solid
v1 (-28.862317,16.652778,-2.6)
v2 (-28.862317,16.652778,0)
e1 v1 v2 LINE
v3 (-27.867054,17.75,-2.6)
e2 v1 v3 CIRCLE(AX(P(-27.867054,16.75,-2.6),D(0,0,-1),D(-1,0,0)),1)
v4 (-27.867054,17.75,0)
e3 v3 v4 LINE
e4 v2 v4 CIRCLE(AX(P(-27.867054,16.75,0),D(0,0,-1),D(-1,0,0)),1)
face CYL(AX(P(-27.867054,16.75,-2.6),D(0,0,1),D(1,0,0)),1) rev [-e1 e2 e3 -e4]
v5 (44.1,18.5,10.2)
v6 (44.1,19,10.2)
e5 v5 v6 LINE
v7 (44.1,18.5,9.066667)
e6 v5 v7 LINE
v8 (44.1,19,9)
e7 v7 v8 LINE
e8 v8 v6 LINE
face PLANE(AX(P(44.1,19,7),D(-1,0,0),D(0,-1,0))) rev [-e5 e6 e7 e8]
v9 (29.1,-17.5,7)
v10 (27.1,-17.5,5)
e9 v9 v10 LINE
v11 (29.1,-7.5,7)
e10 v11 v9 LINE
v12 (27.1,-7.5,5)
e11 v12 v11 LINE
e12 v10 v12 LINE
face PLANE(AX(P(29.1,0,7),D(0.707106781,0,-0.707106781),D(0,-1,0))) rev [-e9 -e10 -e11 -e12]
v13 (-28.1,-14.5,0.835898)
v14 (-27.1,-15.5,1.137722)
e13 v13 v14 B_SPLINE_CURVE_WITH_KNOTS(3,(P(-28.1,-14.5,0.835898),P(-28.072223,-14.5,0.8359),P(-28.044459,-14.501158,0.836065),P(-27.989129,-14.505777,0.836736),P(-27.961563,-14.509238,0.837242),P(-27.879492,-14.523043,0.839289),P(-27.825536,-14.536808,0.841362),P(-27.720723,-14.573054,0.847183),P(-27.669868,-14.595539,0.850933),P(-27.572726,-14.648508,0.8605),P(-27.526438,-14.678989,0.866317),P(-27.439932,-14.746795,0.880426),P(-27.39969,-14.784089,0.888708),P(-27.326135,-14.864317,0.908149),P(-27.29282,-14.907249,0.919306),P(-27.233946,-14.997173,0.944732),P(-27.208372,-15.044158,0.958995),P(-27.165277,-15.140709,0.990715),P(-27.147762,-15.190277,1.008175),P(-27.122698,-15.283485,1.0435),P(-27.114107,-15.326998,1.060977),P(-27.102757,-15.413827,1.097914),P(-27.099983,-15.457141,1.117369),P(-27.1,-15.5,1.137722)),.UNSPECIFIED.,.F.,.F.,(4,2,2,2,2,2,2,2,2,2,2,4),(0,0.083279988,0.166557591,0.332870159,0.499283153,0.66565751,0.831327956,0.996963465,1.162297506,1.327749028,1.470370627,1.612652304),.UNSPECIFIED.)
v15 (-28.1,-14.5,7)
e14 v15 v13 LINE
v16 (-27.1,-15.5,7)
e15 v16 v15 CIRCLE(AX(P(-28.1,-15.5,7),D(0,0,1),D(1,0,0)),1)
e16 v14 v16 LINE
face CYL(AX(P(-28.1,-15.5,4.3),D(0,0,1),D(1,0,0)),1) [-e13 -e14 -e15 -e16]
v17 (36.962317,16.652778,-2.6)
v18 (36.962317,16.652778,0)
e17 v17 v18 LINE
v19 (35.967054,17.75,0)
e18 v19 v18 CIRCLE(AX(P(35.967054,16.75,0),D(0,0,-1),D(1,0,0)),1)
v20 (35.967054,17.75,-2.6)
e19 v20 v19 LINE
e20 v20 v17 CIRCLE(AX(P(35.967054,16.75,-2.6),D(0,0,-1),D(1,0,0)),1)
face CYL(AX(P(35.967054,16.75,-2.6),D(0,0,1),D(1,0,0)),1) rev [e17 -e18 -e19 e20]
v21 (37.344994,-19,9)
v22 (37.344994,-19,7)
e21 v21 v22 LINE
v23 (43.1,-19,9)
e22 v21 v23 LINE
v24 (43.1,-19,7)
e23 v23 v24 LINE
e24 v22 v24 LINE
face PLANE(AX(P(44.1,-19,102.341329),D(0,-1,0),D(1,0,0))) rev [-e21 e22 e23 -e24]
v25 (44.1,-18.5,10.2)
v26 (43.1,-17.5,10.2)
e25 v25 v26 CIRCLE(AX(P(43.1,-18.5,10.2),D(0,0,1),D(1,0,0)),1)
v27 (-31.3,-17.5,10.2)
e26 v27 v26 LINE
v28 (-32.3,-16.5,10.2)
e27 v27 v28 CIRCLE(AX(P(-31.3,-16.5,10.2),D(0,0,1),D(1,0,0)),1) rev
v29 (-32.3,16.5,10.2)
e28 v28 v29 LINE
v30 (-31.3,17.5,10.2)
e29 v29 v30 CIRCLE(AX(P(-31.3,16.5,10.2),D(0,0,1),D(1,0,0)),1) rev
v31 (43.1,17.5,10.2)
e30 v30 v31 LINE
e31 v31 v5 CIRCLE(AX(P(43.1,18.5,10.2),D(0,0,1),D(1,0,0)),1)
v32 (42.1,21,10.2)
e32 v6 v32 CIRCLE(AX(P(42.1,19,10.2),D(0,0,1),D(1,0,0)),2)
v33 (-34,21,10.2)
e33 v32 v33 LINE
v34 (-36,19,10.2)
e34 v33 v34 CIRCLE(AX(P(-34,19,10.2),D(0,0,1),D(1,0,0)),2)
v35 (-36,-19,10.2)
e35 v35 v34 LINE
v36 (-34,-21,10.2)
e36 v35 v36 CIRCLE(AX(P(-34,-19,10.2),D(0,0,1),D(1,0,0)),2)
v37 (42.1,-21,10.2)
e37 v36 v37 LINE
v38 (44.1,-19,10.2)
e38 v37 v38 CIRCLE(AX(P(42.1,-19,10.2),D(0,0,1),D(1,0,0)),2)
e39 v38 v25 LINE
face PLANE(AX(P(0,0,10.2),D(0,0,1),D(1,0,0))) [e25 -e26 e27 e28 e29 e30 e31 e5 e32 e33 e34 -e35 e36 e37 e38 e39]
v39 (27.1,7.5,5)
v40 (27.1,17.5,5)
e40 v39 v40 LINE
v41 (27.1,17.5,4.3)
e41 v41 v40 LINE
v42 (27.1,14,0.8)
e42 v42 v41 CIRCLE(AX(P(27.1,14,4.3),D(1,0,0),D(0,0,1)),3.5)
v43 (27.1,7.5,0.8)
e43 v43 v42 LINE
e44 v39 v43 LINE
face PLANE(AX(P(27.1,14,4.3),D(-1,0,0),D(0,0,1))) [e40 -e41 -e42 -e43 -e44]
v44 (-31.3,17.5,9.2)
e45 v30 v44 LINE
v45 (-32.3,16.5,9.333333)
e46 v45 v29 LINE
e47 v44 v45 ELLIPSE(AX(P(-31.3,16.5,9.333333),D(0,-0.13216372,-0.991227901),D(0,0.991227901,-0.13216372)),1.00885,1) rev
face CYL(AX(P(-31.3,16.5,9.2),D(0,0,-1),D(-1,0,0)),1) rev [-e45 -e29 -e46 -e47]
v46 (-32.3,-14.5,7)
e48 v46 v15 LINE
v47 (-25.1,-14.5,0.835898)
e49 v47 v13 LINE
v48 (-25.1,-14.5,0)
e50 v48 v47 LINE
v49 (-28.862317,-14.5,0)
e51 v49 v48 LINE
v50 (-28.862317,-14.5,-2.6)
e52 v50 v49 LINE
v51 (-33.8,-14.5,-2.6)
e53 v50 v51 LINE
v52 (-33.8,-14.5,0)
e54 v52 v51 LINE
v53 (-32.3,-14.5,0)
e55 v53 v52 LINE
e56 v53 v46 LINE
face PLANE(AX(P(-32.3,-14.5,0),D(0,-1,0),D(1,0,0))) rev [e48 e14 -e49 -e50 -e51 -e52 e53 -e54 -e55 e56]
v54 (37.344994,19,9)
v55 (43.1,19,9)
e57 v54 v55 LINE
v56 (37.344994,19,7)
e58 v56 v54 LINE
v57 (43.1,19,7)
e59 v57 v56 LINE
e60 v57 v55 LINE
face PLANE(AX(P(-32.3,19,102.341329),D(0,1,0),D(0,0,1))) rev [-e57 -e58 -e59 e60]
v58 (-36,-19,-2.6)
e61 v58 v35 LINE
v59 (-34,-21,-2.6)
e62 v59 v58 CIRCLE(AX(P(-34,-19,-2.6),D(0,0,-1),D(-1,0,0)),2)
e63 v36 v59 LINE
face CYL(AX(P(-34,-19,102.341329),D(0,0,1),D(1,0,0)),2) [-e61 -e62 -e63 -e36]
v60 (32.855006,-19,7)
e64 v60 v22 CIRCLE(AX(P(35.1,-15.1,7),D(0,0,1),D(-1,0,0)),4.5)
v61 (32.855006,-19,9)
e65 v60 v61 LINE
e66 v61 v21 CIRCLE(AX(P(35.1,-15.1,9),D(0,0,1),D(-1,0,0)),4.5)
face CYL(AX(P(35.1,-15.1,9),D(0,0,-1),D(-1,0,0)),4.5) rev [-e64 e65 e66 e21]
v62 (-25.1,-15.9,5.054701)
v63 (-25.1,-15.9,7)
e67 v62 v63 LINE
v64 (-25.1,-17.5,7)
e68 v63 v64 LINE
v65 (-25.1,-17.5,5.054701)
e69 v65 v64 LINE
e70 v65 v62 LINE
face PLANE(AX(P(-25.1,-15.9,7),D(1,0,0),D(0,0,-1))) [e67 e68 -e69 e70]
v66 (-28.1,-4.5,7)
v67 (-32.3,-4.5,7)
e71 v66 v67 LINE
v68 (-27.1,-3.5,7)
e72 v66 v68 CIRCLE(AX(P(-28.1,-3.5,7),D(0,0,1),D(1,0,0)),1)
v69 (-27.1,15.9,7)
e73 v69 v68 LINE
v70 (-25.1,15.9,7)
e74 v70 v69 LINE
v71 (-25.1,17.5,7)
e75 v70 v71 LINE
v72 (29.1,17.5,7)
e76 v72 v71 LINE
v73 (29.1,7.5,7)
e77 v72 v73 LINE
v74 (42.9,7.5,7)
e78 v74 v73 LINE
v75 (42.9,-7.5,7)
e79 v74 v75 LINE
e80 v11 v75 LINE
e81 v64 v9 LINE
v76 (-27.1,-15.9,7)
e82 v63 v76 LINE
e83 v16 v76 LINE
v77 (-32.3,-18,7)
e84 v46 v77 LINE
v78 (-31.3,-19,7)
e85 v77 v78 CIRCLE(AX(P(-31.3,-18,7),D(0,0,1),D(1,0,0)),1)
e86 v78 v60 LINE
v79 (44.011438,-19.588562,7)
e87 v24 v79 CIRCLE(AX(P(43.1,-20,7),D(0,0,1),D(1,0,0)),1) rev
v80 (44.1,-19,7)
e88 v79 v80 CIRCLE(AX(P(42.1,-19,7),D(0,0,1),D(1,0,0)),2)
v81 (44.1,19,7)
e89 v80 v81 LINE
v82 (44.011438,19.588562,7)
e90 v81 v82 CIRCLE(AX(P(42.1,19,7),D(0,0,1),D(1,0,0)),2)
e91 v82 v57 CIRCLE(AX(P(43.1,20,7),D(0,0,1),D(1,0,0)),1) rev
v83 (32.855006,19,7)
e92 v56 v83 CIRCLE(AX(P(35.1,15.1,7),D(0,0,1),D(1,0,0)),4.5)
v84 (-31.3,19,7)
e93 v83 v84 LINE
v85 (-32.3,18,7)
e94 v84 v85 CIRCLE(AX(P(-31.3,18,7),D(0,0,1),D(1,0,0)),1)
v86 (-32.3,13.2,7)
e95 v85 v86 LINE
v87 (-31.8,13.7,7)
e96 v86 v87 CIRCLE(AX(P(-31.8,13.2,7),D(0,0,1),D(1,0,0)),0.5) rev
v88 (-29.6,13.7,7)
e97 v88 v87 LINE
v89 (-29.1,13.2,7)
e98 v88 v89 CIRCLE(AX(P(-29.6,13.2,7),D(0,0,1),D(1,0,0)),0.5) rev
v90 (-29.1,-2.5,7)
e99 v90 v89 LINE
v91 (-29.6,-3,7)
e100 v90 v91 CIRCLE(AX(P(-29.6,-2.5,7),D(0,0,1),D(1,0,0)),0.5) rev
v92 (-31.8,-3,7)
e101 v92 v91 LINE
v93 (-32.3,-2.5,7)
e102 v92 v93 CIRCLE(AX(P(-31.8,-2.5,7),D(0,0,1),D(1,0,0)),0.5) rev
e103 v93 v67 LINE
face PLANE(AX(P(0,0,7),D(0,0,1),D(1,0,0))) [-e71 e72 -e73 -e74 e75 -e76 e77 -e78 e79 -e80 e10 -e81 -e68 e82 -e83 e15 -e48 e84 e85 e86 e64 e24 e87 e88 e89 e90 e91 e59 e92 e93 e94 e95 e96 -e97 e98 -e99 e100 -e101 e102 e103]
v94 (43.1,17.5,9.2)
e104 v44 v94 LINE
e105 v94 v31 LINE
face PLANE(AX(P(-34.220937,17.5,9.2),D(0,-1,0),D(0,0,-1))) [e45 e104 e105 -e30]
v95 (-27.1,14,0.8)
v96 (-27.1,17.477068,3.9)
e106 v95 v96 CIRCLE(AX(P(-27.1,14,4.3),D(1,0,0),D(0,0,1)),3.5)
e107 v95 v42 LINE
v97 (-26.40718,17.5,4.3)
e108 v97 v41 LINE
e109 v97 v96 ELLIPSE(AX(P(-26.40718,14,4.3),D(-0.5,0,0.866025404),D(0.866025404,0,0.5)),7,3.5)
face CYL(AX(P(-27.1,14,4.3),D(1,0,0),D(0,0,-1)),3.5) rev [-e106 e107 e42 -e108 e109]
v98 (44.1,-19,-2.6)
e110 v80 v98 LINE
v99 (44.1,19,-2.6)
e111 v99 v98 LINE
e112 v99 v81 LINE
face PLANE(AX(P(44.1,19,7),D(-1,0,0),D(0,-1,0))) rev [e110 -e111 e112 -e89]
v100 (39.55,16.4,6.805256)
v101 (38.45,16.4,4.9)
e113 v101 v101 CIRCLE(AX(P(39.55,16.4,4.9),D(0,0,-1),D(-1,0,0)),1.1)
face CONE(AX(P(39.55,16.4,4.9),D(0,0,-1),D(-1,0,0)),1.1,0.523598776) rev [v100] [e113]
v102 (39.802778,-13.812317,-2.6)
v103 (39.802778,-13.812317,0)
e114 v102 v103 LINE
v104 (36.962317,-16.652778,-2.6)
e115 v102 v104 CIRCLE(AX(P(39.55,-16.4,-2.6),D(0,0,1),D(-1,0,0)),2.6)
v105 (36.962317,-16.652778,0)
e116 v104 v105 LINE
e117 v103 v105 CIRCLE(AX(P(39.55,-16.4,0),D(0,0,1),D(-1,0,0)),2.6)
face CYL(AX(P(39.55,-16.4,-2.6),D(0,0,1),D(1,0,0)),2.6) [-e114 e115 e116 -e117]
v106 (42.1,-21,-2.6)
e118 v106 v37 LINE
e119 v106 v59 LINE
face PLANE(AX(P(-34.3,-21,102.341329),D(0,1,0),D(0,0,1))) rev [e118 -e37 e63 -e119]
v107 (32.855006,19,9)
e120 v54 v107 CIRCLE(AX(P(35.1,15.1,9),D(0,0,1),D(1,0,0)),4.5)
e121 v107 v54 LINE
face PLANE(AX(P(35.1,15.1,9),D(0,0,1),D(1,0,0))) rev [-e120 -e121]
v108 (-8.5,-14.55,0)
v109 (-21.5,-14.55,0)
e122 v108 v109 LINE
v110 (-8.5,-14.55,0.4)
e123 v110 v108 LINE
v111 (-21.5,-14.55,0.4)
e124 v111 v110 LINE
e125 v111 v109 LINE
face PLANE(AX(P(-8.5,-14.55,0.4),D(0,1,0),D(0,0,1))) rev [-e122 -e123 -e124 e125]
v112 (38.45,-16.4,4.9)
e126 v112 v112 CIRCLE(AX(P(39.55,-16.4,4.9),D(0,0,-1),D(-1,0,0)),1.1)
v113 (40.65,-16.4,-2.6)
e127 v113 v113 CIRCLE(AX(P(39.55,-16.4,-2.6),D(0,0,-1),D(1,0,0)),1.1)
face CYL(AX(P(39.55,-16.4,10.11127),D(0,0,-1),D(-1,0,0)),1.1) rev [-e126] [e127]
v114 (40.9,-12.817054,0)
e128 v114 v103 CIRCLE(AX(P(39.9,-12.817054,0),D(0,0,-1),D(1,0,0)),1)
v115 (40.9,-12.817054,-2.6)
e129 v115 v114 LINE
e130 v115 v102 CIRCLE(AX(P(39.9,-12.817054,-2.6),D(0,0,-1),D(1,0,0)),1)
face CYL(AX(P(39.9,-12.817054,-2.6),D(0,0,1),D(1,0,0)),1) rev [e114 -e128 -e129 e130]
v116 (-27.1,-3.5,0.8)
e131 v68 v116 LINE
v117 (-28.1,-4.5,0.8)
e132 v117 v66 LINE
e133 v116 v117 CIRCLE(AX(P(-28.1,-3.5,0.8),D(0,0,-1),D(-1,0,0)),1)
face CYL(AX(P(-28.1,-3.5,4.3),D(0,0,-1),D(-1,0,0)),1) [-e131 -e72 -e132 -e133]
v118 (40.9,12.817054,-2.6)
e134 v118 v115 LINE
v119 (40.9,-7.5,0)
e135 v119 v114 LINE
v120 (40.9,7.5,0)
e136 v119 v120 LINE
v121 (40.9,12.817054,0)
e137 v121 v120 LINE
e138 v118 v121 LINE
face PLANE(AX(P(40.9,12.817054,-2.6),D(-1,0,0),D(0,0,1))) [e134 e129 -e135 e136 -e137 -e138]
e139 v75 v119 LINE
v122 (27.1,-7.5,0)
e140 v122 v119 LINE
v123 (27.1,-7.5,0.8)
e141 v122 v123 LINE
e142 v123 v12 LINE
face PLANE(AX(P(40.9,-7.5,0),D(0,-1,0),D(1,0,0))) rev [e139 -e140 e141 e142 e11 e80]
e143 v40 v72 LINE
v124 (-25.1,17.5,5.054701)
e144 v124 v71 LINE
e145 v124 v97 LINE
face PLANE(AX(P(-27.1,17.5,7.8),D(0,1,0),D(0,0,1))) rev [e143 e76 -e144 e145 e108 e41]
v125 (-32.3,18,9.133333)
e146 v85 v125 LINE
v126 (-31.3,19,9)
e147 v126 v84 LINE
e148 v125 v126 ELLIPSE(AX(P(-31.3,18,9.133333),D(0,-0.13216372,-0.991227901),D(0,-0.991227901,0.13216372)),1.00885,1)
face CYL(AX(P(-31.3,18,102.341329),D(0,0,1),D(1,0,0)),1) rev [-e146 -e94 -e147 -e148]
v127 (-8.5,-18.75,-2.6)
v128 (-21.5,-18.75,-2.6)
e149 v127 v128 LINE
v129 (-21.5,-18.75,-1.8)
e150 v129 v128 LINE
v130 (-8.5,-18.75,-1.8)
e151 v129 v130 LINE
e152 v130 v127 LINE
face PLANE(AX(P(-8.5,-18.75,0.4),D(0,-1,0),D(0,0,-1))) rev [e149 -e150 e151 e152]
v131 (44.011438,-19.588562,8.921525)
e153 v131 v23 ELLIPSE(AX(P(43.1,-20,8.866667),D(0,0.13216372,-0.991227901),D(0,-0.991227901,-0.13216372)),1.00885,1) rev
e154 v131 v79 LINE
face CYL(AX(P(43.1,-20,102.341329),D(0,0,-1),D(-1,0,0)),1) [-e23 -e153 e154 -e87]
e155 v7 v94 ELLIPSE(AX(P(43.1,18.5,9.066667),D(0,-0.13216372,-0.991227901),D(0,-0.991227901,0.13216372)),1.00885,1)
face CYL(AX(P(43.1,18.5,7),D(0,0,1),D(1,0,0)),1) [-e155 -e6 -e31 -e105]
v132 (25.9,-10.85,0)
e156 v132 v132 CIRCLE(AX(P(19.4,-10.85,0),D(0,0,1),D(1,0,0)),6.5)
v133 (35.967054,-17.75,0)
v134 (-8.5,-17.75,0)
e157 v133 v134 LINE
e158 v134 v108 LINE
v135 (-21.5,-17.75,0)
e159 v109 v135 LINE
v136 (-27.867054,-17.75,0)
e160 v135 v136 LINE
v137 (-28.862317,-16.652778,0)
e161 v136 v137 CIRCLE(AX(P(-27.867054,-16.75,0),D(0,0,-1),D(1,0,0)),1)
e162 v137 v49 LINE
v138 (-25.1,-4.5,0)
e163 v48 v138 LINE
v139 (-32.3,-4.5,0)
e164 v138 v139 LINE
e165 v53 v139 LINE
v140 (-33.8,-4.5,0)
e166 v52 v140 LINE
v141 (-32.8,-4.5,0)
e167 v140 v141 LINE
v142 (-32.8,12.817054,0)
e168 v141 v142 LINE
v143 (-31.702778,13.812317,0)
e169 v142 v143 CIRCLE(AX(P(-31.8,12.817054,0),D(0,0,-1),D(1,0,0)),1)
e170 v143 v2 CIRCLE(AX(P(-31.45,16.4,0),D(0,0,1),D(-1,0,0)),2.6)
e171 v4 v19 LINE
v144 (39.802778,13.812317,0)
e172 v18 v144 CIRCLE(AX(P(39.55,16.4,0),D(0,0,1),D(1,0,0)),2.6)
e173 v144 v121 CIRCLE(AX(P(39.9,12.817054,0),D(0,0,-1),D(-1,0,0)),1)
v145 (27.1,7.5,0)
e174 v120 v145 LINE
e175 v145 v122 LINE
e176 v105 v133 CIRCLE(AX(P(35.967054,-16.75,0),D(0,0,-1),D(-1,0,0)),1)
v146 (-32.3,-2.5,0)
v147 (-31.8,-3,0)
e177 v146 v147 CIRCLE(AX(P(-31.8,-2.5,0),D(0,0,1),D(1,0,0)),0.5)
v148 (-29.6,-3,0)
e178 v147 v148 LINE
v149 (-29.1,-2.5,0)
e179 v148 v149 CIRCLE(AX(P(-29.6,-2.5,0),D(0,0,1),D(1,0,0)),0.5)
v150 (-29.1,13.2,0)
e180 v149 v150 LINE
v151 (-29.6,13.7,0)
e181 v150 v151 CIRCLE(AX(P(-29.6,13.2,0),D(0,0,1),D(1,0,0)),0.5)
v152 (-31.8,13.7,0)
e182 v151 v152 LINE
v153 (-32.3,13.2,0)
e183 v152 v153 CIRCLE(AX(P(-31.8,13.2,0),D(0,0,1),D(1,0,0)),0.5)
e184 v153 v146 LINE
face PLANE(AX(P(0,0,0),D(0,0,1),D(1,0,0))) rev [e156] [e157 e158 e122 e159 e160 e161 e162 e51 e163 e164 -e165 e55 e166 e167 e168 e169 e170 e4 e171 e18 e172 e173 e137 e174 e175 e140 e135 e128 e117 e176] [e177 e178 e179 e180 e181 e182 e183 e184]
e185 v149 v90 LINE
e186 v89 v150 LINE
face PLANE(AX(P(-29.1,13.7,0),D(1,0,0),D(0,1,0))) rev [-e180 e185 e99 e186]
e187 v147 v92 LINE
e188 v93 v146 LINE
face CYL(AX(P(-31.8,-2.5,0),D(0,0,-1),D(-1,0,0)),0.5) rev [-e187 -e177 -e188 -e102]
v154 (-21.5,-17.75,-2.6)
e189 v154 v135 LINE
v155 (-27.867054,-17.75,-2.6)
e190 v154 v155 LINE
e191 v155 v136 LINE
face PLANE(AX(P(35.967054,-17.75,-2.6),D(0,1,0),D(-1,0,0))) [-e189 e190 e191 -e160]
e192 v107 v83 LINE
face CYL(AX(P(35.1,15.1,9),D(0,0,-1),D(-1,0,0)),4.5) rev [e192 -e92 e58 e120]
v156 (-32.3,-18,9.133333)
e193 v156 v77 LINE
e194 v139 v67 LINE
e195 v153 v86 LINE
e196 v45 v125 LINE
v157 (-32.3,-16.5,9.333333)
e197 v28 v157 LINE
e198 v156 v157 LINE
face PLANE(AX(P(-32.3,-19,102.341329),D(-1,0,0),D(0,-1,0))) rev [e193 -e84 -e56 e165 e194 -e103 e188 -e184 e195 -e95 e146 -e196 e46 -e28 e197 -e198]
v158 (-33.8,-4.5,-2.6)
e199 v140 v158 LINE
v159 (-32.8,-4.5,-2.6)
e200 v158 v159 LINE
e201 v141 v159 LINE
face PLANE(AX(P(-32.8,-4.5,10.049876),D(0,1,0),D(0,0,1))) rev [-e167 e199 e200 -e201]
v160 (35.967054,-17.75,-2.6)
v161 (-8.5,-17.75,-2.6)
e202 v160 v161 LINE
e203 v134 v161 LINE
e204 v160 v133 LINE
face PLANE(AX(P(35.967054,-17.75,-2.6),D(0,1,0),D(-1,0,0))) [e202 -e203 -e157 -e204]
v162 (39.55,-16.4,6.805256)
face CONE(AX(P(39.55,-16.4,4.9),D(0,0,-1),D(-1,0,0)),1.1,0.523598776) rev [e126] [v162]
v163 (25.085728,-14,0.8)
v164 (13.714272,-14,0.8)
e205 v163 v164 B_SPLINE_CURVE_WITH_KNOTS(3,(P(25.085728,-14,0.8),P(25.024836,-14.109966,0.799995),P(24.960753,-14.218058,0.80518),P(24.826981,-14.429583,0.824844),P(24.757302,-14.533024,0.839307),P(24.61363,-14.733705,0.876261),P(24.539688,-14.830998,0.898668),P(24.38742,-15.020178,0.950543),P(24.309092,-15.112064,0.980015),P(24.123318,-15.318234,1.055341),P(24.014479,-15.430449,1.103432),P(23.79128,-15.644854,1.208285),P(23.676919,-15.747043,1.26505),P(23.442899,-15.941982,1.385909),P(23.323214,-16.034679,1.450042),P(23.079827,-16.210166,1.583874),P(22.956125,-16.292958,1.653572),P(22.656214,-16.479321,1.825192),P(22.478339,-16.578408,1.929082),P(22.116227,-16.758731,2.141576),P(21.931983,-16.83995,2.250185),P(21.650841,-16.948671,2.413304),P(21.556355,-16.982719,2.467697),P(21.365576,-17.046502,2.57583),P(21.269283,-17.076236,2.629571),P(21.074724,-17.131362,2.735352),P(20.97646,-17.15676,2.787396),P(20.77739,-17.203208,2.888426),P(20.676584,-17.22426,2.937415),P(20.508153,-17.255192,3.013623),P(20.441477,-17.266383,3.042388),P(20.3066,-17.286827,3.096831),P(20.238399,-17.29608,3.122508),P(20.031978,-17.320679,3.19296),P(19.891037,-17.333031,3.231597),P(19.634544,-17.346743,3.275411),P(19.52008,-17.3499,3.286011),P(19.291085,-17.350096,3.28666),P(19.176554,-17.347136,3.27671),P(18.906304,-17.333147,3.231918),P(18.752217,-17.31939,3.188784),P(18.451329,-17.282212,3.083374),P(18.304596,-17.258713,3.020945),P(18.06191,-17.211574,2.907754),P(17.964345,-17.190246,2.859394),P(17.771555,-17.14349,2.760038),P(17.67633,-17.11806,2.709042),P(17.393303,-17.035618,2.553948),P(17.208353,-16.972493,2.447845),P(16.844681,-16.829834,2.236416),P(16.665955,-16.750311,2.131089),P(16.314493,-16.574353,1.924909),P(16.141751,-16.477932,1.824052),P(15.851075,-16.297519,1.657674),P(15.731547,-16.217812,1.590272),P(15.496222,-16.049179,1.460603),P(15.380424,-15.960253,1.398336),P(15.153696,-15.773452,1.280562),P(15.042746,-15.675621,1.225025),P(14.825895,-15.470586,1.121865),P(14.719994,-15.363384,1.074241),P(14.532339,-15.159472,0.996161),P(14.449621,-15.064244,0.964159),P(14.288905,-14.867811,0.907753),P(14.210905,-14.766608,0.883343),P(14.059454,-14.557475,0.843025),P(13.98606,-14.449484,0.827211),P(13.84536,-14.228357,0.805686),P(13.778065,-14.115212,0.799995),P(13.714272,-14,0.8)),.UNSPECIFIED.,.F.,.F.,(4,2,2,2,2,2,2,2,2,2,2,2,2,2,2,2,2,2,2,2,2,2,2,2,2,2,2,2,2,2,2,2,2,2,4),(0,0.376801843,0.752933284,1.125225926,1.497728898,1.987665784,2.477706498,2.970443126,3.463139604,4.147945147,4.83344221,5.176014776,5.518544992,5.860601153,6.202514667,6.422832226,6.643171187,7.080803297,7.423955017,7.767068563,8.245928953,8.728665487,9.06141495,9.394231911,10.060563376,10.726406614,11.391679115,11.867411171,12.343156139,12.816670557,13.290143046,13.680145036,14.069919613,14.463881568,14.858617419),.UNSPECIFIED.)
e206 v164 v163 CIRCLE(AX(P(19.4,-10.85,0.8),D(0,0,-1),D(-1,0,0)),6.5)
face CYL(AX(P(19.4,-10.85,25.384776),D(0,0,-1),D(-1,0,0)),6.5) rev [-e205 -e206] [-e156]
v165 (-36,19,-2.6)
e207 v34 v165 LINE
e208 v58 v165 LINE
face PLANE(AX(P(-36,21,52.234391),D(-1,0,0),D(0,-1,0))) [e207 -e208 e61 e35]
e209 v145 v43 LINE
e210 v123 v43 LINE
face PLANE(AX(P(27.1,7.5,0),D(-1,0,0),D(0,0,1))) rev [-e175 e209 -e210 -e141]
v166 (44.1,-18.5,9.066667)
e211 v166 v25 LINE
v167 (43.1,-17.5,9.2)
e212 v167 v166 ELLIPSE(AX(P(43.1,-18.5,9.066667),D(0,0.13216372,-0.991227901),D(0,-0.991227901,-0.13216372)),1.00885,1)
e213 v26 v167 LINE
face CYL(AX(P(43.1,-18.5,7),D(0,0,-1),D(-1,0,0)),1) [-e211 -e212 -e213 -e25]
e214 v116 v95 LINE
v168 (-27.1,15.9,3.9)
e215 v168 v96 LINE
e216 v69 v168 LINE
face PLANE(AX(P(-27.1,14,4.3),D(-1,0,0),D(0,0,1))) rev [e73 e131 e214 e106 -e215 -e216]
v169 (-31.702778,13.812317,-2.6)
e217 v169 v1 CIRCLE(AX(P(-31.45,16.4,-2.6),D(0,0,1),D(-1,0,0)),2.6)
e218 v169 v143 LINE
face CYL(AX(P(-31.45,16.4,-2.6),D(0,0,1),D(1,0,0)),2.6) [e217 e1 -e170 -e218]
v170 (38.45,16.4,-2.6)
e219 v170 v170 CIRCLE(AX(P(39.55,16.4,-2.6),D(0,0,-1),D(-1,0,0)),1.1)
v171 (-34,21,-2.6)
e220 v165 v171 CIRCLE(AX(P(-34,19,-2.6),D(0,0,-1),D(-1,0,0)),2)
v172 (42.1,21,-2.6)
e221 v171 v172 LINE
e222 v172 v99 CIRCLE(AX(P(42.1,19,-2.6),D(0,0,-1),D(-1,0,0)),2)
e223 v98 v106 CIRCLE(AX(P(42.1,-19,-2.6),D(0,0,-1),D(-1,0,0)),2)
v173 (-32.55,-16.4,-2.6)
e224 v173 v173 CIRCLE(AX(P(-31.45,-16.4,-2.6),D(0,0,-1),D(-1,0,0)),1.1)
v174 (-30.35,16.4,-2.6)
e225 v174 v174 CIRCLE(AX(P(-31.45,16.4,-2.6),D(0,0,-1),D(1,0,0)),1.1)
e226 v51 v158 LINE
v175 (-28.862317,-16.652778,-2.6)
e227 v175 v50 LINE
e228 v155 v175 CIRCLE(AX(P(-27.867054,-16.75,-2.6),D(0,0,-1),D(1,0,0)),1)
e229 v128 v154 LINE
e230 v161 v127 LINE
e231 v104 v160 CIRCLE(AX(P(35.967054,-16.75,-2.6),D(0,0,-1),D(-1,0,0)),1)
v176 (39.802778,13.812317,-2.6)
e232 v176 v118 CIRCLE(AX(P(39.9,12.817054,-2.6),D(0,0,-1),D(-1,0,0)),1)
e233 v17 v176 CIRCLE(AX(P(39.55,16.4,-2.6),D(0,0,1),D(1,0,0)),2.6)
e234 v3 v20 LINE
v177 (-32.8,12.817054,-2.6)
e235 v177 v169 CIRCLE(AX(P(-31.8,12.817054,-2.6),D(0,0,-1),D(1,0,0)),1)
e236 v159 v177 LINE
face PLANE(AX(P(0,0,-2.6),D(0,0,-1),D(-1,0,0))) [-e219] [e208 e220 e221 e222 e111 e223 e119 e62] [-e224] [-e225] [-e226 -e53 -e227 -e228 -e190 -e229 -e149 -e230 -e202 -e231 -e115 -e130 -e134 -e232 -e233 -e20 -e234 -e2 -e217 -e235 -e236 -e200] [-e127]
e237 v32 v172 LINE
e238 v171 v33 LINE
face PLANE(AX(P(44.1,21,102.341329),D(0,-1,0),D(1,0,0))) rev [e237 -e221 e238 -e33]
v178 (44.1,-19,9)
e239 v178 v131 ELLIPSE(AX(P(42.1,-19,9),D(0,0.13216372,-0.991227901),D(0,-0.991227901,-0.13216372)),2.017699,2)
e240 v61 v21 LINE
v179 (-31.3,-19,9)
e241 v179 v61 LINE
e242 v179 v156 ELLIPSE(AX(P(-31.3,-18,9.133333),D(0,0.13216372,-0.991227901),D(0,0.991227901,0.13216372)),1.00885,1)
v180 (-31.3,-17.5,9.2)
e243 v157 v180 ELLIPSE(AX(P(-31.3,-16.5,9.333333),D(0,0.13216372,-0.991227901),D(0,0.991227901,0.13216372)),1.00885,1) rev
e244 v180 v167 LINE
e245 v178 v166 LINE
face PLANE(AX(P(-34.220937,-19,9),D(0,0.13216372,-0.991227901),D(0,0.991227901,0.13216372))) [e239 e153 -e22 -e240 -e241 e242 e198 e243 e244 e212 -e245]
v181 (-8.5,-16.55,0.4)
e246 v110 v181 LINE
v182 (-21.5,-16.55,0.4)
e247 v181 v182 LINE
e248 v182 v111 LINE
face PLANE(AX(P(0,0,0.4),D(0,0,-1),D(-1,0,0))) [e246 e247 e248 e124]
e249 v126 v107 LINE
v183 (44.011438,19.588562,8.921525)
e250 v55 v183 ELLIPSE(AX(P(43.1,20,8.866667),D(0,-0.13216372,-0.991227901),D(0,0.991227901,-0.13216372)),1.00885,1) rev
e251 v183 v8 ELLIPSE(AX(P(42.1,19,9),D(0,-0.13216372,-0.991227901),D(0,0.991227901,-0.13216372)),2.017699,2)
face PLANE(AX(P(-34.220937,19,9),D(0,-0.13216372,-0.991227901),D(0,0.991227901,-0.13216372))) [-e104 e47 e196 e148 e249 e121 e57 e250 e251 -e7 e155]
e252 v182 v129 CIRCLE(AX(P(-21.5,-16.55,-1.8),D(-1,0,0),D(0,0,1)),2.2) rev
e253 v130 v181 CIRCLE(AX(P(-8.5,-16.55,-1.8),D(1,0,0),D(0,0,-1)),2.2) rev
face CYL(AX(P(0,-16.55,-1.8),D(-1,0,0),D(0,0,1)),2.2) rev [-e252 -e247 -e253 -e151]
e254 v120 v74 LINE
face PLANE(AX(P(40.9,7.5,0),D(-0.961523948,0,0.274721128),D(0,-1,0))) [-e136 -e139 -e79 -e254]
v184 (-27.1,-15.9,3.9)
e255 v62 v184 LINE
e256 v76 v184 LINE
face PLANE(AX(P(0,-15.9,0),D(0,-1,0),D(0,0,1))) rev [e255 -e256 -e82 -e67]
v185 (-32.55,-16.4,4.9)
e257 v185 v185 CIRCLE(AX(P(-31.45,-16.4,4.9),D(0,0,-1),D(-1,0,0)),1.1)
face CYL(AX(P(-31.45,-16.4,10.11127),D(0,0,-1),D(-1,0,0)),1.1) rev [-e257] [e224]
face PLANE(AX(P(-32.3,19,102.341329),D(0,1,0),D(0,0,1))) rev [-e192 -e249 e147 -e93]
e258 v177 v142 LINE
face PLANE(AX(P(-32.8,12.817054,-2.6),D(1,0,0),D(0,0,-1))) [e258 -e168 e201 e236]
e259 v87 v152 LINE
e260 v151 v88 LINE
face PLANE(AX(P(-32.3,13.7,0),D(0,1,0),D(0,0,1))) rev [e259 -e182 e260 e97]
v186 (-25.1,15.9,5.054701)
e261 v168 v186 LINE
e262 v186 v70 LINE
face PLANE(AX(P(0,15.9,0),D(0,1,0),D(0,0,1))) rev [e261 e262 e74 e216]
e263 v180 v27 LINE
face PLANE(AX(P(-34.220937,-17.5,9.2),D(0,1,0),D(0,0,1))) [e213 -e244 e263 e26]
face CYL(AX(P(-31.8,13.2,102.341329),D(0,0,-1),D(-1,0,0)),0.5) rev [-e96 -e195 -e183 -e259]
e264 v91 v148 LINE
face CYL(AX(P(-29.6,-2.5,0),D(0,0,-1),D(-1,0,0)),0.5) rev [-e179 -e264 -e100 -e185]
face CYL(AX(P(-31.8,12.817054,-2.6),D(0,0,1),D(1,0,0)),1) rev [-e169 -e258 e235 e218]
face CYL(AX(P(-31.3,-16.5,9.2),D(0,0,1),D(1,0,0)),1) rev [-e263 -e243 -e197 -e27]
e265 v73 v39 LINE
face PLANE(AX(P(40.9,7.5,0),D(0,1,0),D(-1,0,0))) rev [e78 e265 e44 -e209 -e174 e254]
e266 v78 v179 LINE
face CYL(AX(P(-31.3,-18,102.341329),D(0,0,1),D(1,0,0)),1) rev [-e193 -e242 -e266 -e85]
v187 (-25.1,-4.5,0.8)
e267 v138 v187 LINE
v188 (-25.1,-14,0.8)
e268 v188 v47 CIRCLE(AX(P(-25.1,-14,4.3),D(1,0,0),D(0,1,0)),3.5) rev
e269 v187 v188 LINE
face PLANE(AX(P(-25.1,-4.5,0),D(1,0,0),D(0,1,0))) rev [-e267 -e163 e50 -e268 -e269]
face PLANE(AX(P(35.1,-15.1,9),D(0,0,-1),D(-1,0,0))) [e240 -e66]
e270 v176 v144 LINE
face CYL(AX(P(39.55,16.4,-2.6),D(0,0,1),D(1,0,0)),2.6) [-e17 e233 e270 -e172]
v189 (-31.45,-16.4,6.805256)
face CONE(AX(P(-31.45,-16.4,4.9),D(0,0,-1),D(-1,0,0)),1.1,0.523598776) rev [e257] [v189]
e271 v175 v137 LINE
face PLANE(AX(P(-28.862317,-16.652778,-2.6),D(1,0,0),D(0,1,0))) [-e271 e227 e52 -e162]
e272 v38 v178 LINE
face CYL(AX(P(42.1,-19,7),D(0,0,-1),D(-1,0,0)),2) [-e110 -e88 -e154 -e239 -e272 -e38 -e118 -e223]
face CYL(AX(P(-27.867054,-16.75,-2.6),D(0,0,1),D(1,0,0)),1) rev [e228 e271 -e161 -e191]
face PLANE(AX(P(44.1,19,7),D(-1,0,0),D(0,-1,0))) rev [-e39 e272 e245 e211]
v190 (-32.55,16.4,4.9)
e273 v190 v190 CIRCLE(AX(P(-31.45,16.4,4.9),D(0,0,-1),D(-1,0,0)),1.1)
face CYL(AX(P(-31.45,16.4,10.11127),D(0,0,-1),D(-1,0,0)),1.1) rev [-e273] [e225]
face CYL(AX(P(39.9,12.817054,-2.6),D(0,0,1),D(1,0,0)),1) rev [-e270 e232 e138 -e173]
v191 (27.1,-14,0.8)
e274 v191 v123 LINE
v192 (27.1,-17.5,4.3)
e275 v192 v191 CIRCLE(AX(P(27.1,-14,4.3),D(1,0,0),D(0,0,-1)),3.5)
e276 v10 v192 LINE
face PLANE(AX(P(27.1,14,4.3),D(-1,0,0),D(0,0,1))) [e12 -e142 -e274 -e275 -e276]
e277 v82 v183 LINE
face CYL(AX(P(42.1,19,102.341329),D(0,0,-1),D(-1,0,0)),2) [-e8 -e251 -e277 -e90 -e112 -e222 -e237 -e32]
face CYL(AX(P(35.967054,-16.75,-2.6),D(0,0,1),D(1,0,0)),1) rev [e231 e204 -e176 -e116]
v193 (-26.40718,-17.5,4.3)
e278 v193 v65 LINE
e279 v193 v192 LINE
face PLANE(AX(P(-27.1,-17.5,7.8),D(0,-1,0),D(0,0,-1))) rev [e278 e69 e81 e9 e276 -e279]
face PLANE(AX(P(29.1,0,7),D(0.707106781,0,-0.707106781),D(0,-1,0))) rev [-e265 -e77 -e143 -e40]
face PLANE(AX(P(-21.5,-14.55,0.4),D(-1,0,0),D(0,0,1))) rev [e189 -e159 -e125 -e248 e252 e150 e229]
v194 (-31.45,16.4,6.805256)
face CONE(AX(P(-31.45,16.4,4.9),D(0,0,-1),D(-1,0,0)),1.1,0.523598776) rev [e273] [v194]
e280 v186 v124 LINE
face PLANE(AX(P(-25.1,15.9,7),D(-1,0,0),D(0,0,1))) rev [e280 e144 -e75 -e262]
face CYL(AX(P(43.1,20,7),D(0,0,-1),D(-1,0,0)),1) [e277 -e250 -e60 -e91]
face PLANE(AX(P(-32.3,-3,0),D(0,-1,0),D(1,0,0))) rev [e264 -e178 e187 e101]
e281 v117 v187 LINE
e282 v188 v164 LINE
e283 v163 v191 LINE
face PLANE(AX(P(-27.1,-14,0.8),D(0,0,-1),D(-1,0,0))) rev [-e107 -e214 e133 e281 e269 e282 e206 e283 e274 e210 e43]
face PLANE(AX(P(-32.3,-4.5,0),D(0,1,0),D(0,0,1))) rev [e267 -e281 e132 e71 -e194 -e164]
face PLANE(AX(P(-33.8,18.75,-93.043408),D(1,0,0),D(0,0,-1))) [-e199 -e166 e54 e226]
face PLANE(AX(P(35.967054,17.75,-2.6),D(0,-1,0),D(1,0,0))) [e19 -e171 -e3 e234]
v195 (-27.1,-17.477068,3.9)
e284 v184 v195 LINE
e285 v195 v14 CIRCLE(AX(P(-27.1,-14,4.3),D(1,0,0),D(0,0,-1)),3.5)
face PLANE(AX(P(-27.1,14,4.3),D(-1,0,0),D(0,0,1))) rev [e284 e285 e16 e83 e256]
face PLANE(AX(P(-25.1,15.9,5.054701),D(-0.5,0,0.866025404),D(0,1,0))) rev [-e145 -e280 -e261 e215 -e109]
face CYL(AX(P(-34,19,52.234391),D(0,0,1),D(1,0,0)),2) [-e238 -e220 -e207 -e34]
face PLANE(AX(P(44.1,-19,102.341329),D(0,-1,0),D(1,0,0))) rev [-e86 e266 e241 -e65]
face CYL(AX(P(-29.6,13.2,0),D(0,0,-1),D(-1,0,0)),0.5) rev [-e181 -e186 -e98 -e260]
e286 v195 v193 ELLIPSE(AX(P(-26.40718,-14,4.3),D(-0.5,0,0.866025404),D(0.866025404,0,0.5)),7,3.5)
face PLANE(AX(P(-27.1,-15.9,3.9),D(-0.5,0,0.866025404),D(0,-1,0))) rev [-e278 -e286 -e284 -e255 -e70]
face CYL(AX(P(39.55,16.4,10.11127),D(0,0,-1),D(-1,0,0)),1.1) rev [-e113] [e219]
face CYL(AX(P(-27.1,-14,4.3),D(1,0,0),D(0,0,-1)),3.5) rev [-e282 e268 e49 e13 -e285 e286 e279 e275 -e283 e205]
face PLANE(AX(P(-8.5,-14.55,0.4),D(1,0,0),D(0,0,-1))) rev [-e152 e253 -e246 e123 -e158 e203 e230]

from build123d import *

# Parameters (mm, degrees)
SKETCH2_W                 = 76.4
SKETCH2_H                 = 38
BOSS_EXTRUDE1_DEPTH       = 7
CUT_BATTERY_DEPTH         = 27.1
SKETCH4_W                 = 13.8
SKETCH4_H                 = 15
CUT_FOR_FINGER_DEPTH      = 49.526384576
CHAMFER3_SIZE2            = 7
CHAMFER3_SIZE             = 2
SKETCH5_W                 = 2
SKETCH5_H                 = 3.1
BOSS_EXTRUDE2_DEPTH       = 1.6
CHAMFER1_SIZE2            = 2
CHAMFER1_SIZE             = 1.154700538
CHAMFER1_OF_MIRROR1_SIZE2 = 1.154700538
CHAMFER1_OF_MIRROR1_SIZE  = 2
SKETCH6_W                 = 7.2
SKETCH6_H                 = 10
CUT_CONNECTOR_DEPTH       = 49.526384576
BOSS_EXTRUDE3_DEPTH       = 10.2
SKETCH10_R                = 4.5
CUT_LATCH_DEPTH           = 2
BOSS_EXTRUDE4_REACH       = 83.802
FILLET3_R                 = 1
CHAMFER2_SIZE             = 2
FILLET2_R                 = 1
SKETCH12_W                = 3.2
SKETCH12_H                = 16.7
CUT_EXTRUDE6_DEPTH        = 50.343793936
FILLET1_R                 = 0.5
SKETCH13_W                = 1.7
SKETCH13_H                = 42
BOSS_EXTRUDE5_DEPTH       = 10.2
SKETCH16_R                = 1.1
CUT_EXTRUDE7_DEPTH        = 3
PCB_START                 = 2.6
SKETCH18_W                = 75.7
SKETCH18_H                = 37.5
SKETCH18_R                = 1.1
PCB_STAND_DEPTH           = 2.6
SKETCH19_W                = 1
SKETCH19_H                = 10
CUT_EXTRUDE8_DEPTH        = 2.6
F_2_0MM_DOWEL_HOLE1_D     = 2.2
F_2_0MM_DOWEL_HOLE1_DEPTH = 7.5
F_2_0MM_DOWEL_HOLE1_TIP   = 1.905255888
SKETCH22_W                = 80.1
SKETCH22_H                = 42
SKETCH22_W_2              = 75.7
SKETCH22_H_2              = 37.5
BOSS_EXTRUDE8_DEPTH       = 2.6
FILLET4_R                 = 2
FILLET5_R                 = 1
FILLET6_R                 = 1
FILLET7_R                 = 1
SKETCH23_W                = 13
SKETCH23_H                = 4.2
CUT_CAPACITOR_DEPTH       = 3
FILLET8_R                 = 2.2
MOTOR_START               = -5.886343
SKETCH24_R                = 6.5
MOTOR_DEPTH               = 3.286343


# Some blends are built 0.0001 mm under size
with BuildPart() as part:
    # Sketch2 → Boss-Extrude1 (new body)
    with BuildSketch(Plane.XY):
        with Locations((5.9, 0)):
            Rectangle(SKETCH2_W, SKETCH2_H)
    extrude(amount=BOSS_EXTRUDE1_DEPTH)

    # Sketch3 → Cut-Battery (cut, symmetric)
    with BuildSketch(Plane(origin=(0, 0, 0), x_dir=(0, 0, -1), z_dir=(1, 0, 0))):
        with BuildLine():
            Line((-7.8, 17.5), (-4.3, 17.5))
            ThreePointArc((-4.3, 17.5), (-1.825126266, 16.474873734), (-0.8, 14))
            Line((-0.8, 14), (-0.8, -14))
            ThreePointArc((-0.8, -14), (-1.825126266, -16.474873734), (-4.3, -17.5))
            Line((-4.3, -17.5), (-7.8, -17.5))
            Line((-7.8, -17.5), (-7.8, 17.5))
        make_face()
    extrude(amount=CUT_BATTERY_DEPTH, both=True, mode=Mode.SUBTRACT)

    # Sketch4 → Cut for finger (cut, through all)
    with BuildSketch(Plane.XY.offset(7)):
        with Locations((34, 0)):
            Rectangle(SKETCH4_W, SKETCH4_H)
    extrude(amount=-CUT_FOR_FINGER_DEPTH, mode=Mode.SUBTRACT)

    # Chamfer3
    chamfer3_edges = [part.edges().sort_by_distance(p)[0] for p in [
        (40.9, 0, 7),
    ]]
    chamfer3_side = [part.faces().sort_by_distance(p)[0] for p in [
        (40.94, 0, 7),
    ]]
    chamfer(chamfer3_edges, length=CHAMFER3_SIZE - 0.0001, length2=CHAMFER3_SIZE2 - 0.0001, reference=chamfer3_side[0])  # a hair under: the kernel refuses the full size

    # Sketch5 → Boss-Extrude2 (add)
    with BuildSketch(Plane.XZ.offset(-17.5)):
        with Locations((-26.1, 5.45)):
            Rectangle(SKETCH5_W, SKETCH5_H)
    boss_extrude2 = extrude(amount=BOSS_EXTRUDE2_DEPTH)

    # Chamfer1
    chamfer1_edges = [part.edges().sort_by_distance(p)[0] for p in [
        (-25.1, 16.688533865, 3.9),
    ]]
    chamfer1_side = [part.faces().sort_by_distance(p)[0] for p in [
        (-25.1, 16.688533865, 3.923094011),
    ]]
    chamfer(chamfer1_edges, length=CHAMFER1_SIZE - 0.0001, length2=CHAMFER1_SIZE2 - 0.0001, reference=chamfer1_side[0])  # a hair under: the kernel refuses the full size

    # Mirror1: Boss-Extrude2 across plane
    add(boss_extrude2.mirror(Plane.ZX))

    # Chamfer1 of Mirror1
    chamfer1_of_mirror1_edges = [part.edges().sort_by_distance(p)[0] for p in [
        (-25.1, -16.688533865, 3.9),
    ]]
    chamfer1_of_mirror1_side = [part.faces().sort_by_distance(p)[0] for p in [
        (-25.123094011, -16.688533865, 3.9),
    ]]
    chamfer(chamfer1_of_mirror1_edges, length=CHAMFER1_OF_MIRROR1_SIZE - 0.0001, length2=CHAMFER1_OF_MIRROR1_SIZE2 - 0.0001, reference=chamfer1_of_mirror1_side[0])  # a hair under: the kernel refuses the full size

    # Sketch6 → Cut-Connector (cut, through all)
    with BuildSketch(Plane.XY.offset(7)):
        with Locations((-28.7, -9.5)):
            Rectangle(SKETCH6_W, SKETCH6_H)
    extrude(amount=-CUT_CONNECTOR_DEPTH, mode=Mode.SUBTRACT)

    # Sketch9 → Boss-Extrude3 (add)
    with BuildSketch(Plane.XY):
        Polygon((44.1, -19), (-32.3, -19), (-32.3, 19), (44.1, 19), (44.1, 21), (-34.3, 21), (-34.3, -21), (44.1, -21), align=None)
    extrude(amount=BOSS_EXTRUDE3_DEPTH)

    # Sketch10 → Cut-Latch (cut)
    with BuildSketch(Plane.XY.offset(7)):
        with Locations((35.1, 15.1)):
            Circle(SKETCH10_R)
        with Locations((35.1, -15.1)):
            Circle(SKETCH10_R)
    extrude(amount=CUT_LATCH_DEPTH, mode=Mode.SUBTRACT)

    # Boss-Extrude4: up to this face of the body (flat: up to its plane)
    boss_extrude4_end = Plane(part.part.faces().sort_by_distance((-32.3, -16.75, 7.393451395))[0])
    # Sketch11 → Boss-Extrude4 (add, up to the picked face)
    with BuildSketch(Plane(origin=(44.1, 0, 0), x_dir=(0, 0, -1), z_dir=(1, 0, 0)), mode=Mode.PRIVATE) as boss_extrude4_sk1:
        Polygon((-10.2, 19), (-9, 19), (-9.2, 17.5), (-10.2, 17.5), align=None)
    boss_extrude4_tool1 = split(extrude(boss_extrude4_sk1.sketch, amount=-BOSS_EXTRUDE4_REACH, mode=Mode.PRIVATE), bisect_by=boss_extrude4_end, keep=Keep.BOTH, mode=Mode.PRIVATE)
    # Sketch11 → Boss-Extrude4 (add, up to the picked face)
    with BuildSketch(Plane(origin=(44.1, 0, 0), x_dir=(0, 0, -1), z_dir=(1, 0, 0)), mode=Mode.PRIVATE) as boss_extrude4_sk2:
        Polygon((-9.2, -17.5), (-10.2, -17.5), (-10.2, -19), (-9, -19), align=None)
    boss_extrude4_tool2 = split(extrude(boss_extrude4_sk2.sketch, amount=-BOSS_EXTRUDE4_REACH, mode=Mode.PRIVATE), bisect_by=boss_extrude4_end, keep=Keep.BOTH, mode=Mode.PRIVATE)
    add(boss_extrude4_tool1.solids().sort_by(Axis((44.1, 18.272727, 9.648485), (-1, 0, 0)))[0])
    add(boss_extrude4_tool2.solids().sort_by(Axis((44.1, -18.272727, 9.648485), (-1, 0, 0)))[0])

    # Fillet3
    fillet3_edges = [part.edges().sort_by_distance(p)[0] for p in [
        (44.1, 19, 8),
        (44.1, -19, 8),
    ]]
    fillet(fillet3_edges, radius=FILLET3_R)

    # Chamfer2
    chamfer2_edges = [part.edges().sort_by_distance(p)[0] for p in [
        (27.1, 12.5, 7),
        (27.1, -12.5, 7),
    ]]
    chamfer(chamfer2_edges, length=CHAMFER2_SIZE)

    # Fillet2
    fillet2_edges = [part.edges().sort_by_distance(p)[0] for p in [
        (-27.1, -4.5, 3.9),
        (-27.1, -14.5, 3.917949192),
    ]]
    fillet(fillet2_edges, radius=FILLET2_R)

    # Sketch12 → Cut-Extrude6 (cut, through all)
    with BuildSketch(Plane.XY.offset(7)):
        with Locations((-30.7, 5.35)):
            Rectangle(SKETCH12_W, SKETCH12_H)
    extrude(amount=-CUT_EXTRUDE6_DEPTH, mode=Mode.SUBTRACT)

    # Fillet1
    fillet1_edges = [part.edges().sort_by_distance(p)[0] for p in [
        (-32.3, -3, 3.5),
        (-32.3, 13.7, 3.5),
        (-29.1, 13.7, 3.5),
        (-29.1, -3, 3.5),
    ]]
    fillet(fillet1_edges, radius=FILLET1_R)

    # Sketch13 → Boss-Extrude5 (add)
    with BuildSketch(Plane(origin=(0, 0, 0), x_dir=(-1, 0, 0), z_dir=(0, 0, -1))):
        with Locations((35.15, 0)):
            Rectangle(SKETCH13_W, SKETCH13_H)
    extrude(amount=-BOSS_EXTRUDE5_DEPTH)

    # Sketch16 → Cut-Extrude7 (cut)
    with BuildSketch(Plane(origin=(0, 0, 0), x_dir=(-1, 0, 0), z_dir=(0, 0, -1))):
        with Locations((-39.55, 16.4)):
            Circle(SKETCH16_R)
        with Locations((31.45, 16.4)):
            Circle(SKETCH16_R)
        with Locations((31.45, -16.4)):
            Circle(SKETCH16_R)
        with Locations((-39.55, -16.4)):
            Circle(SKETCH16_R)
    extrude(amount=-CUT_EXTRUDE7_DEPTH, mode=Mode.SUBTRACT)

    # Sketch18 → PCB stand (add)
    with BuildSketch(Plane(origin=(0, 0, 0), x_dir=(-1, 0, 0), z_dir=(0, 0, -1)).offset(PCB_START)):
        with Locations((-4.05, 0)):
            Rectangle(SKETCH18_W, SKETCH18_H)
        with Locations((-39.55, 16.4)):
            Circle(SKETCH18_R, mode=Mode.SUBTRACT)
        with Locations(Location((-39.55, -16.4, 0), (0, 0, 180))):
            Circle(SKETCH18_R, mode=Mode.SUBTRACT)
        with Locations((31.45, -16.4)):
            Circle(SKETCH18_R, mode=Mode.SUBTRACT)
        with Locations(Location((31.45, 16.4, 0), (0, 0, 180))):
            Circle(SKETCH18_R, mode=Mode.SUBTRACT)
        with BuildLine():
            Line((-35.967054285, 17.75), (27.867054285, 17.75))
            ThreePointArc((27.867054285, 17.75), (28.607737153, 17.421854812), (28.862316983, 16.652777778))
            ThreePointArc((28.862316983, 16.652777778), (29.611522369, 14.561522369), (31.702777778, 13.812316983))
            ThreePointArc((31.702777778, 13.812316983), (32.471854812, 13.557737153), (32.8, 12.817054285))
            Line((32.8, 12.817054285), (32.8, -12.817054285))
            Line((32.8, -12.817054285), (32.8, -14.5))
            Line((32.8, -14.5), (28.862316983, -14.5))
            Line((28.862316983, -14.5), (28.862316983, -16.652777778))
            ThreePointArc((28.862316983, -16.652777778), (28.607737153, -17.421854812), (27.867054285, -17.75))
            Line((27.867054285, -17.75), (-35.967054285, -17.75))
            ThreePointArc((-35.967054285, -17.75), (-36.707737153, -17.421854812), (-36.962316983, -16.652777778))
            ThreePointArc((-36.962316983, -16.652777778), (-37.711522369, -14.561522369), (-39.802777778, -13.812316983))
            ThreePointArc((-39.802777778, -13.812316983), (-40.571854812, -13.557737153), (-40.9, -12.817054285))
            Line((-40.9, -12.817054285), (-40.9, 12.817054285))
            ThreePointArc((-40.9, 12.817054285), (-40.571854812, 13.557737153), (-39.802777778, 13.812316983))
            ThreePointArc((-39.802777778, 13.812316983), (-37.711522369, 14.561522369), (-36.962316983, 16.652777778))
            ThreePointArc((-36.962316983, 16.652777778), (-36.707737153, 17.421854812), (-35.967054285, 17.75))
        make_face(mode=Mode.SUBTRACT)
    extrude(amount=-PCB_STAND_DEPTH)

    # Sketch19 → Cut-Extrude8 (cut)
    with BuildSketch(Plane(origin=(0, 0, -2.6), x_dir=(-1, 0, 0), z_dir=(0, 0, -1))):
        with Locations((33.3, -9.5)):
            Rectangle(SKETCH19_W, SKETCH19_H)
    extrude(amount=-CUT_EXTRUDE8_DEPTH, mode=Mode.SUBTRACT)

    # Ø2.0mm Dowel Hole1
    with Locations(Plane(origin=(0, 0, -2.6), x_dir=(-1, 0, 0), z_dir=(0, 0, -1))):
        with Locations((-39.55, -16.4), (-39.55, 16.4), (31.45, 16.4), (31.45, -16.4)):
            Hole(F_2_0MM_DOWEL_HOLE1_D / 2, depth=F_2_0MM_DOWEL_HOLE1_DEPTH)
            with Locations((0, 0, -(F_2_0MM_DOWEL_HOLE1_DEPTH + F_2_0MM_DOWEL_HOLE1_TIP / 2))):  # 60° drill point
                Cone(0, F_2_0MM_DOWEL_HOLE1_D / 2, F_2_0MM_DOWEL_HOLE1_TIP, mode=Mode.SUBTRACT)

    # Sketch22 → Boss-Extrude8 (add)
    with BuildSketch(Plane(origin=(0, 0, 0), x_dir=(-1, 0, 0), z_dir=(0, 0, -1))):
        with Locations((-4.05, 0)):
            Rectangle(SKETCH22_W, SKETCH22_H)
        with Locations((-4.05, 0)):
            Rectangle(SKETCH22_W_2, SKETCH22_H_2, mode=Mode.SUBTRACT)
    extrude(amount=BOSS_EXTRUDE8_DEPTH)

    # Fillet4
    # the kernel refuses this fillet: 2 mm, written as the material it takes off along each edge
    with BuildSketch(Plane(origin=(44.1, 21, -7.6), x_dir=(-1, 0, 0), z_dir=(0, 0, 1)), Plane(origin=(44.1, -21, 15.2), x_dir=(-1, 0, 0), z_dir=(0, 0, -1)), Plane(origin=(-36, -21, 15.2), x_dir=(0, 1, 0), z_dir=(0, 0, -1)), Plane(origin=(-36, 21, -7.6), x_dir=(0, -1, 0), z_dir=(0, 0, 1))) as fillet4_piece_1:
        with BuildLine():
            CenterArc((FILLET4_R, FILLET4_R), FILLET4_R, 180, 90)
            Line((0, FILLET4_R), (-FILLET4_R * 0.02, FILLET4_R))
            Line((-FILLET4_R * 0.02, FILLET4_R), (-FILLET4_R * 0.02, -FILLET4_R * 0.02))
            Line((-FILLET4_R * 0.02, -FILLET4_R * 0.02), (FILLET4_R, -FILLET4_R * 0.02))
            Line((FILLET4_R, -FILLET4_R * 0.02), (FILLET4_R, 0))
        make_face()
    extrude(amount=22.8, mode=Mode.SUBTRACT)

    # Fillet5
    fillet5_edges = [part.edges().sort_by_distance(p)[0] for p in [
        (44.1, 17.5, 9.7),
        (44.1, -17.5, 9.7),
    ]]
    fillet(fillet5_edges, radius=FILLET5_R)

    # Fillet6
    fillet6_edges = [part.edges().sort_by_distance(p)[0] for p in [
        (-32.3, 17.5, 9.7),
        (-32.3, -17.5, 9.7),
    ]]
    fillet(fillet6_edges, radius=FILLET6_R)

    # Fillet7
    fillet7_edges = [part.edges().sort_by_distance(p)[0] for p in [
        (-32.3, 19, 8),
        (-32.3, -19, 8),
    ]]
    fillet(fillet7_edges, radius=FILLET7_R)

    # Sketch23 → Cut-Capacitor (cut)
    with BuildSketch(Plane(origin=(0, 0, -2.6), x_dir=(-1, 0, 0), z_dir=(0, 0, -1))):
        with Locations((15, -16.65)):
            Rectangle(SKETCH23_W, SKETCH23_H)
    extrude(amount=-CUT_CAPACITOR_DEPTH, mode=Mode.SUBTRACT)

    # Fillet8
    fillet8_edges = [part.edges().sort_by_distance(p)[0] for p in [
        (-15, -18.75, 0.4),
    ]]
    fillet(fillet8_edges, radius=FILLET8_R)

    # Sketch24 → Motor (cut)
    with BuildSketch(Plane(origin=(0, 0, -2.6), x_dir=(-1, 0, 0), z_dir=(0, 0, -1)).offset(MOTOR_START)):
        with Locations(Location((-19.4, -10.85, 0), (0, 0, 331.012723469))):
            Circle(SKETCH24_R)
    extrude(amount=MOTOR_DEPTH, mode=Mode.SUBTRACT)


solid = part.part
